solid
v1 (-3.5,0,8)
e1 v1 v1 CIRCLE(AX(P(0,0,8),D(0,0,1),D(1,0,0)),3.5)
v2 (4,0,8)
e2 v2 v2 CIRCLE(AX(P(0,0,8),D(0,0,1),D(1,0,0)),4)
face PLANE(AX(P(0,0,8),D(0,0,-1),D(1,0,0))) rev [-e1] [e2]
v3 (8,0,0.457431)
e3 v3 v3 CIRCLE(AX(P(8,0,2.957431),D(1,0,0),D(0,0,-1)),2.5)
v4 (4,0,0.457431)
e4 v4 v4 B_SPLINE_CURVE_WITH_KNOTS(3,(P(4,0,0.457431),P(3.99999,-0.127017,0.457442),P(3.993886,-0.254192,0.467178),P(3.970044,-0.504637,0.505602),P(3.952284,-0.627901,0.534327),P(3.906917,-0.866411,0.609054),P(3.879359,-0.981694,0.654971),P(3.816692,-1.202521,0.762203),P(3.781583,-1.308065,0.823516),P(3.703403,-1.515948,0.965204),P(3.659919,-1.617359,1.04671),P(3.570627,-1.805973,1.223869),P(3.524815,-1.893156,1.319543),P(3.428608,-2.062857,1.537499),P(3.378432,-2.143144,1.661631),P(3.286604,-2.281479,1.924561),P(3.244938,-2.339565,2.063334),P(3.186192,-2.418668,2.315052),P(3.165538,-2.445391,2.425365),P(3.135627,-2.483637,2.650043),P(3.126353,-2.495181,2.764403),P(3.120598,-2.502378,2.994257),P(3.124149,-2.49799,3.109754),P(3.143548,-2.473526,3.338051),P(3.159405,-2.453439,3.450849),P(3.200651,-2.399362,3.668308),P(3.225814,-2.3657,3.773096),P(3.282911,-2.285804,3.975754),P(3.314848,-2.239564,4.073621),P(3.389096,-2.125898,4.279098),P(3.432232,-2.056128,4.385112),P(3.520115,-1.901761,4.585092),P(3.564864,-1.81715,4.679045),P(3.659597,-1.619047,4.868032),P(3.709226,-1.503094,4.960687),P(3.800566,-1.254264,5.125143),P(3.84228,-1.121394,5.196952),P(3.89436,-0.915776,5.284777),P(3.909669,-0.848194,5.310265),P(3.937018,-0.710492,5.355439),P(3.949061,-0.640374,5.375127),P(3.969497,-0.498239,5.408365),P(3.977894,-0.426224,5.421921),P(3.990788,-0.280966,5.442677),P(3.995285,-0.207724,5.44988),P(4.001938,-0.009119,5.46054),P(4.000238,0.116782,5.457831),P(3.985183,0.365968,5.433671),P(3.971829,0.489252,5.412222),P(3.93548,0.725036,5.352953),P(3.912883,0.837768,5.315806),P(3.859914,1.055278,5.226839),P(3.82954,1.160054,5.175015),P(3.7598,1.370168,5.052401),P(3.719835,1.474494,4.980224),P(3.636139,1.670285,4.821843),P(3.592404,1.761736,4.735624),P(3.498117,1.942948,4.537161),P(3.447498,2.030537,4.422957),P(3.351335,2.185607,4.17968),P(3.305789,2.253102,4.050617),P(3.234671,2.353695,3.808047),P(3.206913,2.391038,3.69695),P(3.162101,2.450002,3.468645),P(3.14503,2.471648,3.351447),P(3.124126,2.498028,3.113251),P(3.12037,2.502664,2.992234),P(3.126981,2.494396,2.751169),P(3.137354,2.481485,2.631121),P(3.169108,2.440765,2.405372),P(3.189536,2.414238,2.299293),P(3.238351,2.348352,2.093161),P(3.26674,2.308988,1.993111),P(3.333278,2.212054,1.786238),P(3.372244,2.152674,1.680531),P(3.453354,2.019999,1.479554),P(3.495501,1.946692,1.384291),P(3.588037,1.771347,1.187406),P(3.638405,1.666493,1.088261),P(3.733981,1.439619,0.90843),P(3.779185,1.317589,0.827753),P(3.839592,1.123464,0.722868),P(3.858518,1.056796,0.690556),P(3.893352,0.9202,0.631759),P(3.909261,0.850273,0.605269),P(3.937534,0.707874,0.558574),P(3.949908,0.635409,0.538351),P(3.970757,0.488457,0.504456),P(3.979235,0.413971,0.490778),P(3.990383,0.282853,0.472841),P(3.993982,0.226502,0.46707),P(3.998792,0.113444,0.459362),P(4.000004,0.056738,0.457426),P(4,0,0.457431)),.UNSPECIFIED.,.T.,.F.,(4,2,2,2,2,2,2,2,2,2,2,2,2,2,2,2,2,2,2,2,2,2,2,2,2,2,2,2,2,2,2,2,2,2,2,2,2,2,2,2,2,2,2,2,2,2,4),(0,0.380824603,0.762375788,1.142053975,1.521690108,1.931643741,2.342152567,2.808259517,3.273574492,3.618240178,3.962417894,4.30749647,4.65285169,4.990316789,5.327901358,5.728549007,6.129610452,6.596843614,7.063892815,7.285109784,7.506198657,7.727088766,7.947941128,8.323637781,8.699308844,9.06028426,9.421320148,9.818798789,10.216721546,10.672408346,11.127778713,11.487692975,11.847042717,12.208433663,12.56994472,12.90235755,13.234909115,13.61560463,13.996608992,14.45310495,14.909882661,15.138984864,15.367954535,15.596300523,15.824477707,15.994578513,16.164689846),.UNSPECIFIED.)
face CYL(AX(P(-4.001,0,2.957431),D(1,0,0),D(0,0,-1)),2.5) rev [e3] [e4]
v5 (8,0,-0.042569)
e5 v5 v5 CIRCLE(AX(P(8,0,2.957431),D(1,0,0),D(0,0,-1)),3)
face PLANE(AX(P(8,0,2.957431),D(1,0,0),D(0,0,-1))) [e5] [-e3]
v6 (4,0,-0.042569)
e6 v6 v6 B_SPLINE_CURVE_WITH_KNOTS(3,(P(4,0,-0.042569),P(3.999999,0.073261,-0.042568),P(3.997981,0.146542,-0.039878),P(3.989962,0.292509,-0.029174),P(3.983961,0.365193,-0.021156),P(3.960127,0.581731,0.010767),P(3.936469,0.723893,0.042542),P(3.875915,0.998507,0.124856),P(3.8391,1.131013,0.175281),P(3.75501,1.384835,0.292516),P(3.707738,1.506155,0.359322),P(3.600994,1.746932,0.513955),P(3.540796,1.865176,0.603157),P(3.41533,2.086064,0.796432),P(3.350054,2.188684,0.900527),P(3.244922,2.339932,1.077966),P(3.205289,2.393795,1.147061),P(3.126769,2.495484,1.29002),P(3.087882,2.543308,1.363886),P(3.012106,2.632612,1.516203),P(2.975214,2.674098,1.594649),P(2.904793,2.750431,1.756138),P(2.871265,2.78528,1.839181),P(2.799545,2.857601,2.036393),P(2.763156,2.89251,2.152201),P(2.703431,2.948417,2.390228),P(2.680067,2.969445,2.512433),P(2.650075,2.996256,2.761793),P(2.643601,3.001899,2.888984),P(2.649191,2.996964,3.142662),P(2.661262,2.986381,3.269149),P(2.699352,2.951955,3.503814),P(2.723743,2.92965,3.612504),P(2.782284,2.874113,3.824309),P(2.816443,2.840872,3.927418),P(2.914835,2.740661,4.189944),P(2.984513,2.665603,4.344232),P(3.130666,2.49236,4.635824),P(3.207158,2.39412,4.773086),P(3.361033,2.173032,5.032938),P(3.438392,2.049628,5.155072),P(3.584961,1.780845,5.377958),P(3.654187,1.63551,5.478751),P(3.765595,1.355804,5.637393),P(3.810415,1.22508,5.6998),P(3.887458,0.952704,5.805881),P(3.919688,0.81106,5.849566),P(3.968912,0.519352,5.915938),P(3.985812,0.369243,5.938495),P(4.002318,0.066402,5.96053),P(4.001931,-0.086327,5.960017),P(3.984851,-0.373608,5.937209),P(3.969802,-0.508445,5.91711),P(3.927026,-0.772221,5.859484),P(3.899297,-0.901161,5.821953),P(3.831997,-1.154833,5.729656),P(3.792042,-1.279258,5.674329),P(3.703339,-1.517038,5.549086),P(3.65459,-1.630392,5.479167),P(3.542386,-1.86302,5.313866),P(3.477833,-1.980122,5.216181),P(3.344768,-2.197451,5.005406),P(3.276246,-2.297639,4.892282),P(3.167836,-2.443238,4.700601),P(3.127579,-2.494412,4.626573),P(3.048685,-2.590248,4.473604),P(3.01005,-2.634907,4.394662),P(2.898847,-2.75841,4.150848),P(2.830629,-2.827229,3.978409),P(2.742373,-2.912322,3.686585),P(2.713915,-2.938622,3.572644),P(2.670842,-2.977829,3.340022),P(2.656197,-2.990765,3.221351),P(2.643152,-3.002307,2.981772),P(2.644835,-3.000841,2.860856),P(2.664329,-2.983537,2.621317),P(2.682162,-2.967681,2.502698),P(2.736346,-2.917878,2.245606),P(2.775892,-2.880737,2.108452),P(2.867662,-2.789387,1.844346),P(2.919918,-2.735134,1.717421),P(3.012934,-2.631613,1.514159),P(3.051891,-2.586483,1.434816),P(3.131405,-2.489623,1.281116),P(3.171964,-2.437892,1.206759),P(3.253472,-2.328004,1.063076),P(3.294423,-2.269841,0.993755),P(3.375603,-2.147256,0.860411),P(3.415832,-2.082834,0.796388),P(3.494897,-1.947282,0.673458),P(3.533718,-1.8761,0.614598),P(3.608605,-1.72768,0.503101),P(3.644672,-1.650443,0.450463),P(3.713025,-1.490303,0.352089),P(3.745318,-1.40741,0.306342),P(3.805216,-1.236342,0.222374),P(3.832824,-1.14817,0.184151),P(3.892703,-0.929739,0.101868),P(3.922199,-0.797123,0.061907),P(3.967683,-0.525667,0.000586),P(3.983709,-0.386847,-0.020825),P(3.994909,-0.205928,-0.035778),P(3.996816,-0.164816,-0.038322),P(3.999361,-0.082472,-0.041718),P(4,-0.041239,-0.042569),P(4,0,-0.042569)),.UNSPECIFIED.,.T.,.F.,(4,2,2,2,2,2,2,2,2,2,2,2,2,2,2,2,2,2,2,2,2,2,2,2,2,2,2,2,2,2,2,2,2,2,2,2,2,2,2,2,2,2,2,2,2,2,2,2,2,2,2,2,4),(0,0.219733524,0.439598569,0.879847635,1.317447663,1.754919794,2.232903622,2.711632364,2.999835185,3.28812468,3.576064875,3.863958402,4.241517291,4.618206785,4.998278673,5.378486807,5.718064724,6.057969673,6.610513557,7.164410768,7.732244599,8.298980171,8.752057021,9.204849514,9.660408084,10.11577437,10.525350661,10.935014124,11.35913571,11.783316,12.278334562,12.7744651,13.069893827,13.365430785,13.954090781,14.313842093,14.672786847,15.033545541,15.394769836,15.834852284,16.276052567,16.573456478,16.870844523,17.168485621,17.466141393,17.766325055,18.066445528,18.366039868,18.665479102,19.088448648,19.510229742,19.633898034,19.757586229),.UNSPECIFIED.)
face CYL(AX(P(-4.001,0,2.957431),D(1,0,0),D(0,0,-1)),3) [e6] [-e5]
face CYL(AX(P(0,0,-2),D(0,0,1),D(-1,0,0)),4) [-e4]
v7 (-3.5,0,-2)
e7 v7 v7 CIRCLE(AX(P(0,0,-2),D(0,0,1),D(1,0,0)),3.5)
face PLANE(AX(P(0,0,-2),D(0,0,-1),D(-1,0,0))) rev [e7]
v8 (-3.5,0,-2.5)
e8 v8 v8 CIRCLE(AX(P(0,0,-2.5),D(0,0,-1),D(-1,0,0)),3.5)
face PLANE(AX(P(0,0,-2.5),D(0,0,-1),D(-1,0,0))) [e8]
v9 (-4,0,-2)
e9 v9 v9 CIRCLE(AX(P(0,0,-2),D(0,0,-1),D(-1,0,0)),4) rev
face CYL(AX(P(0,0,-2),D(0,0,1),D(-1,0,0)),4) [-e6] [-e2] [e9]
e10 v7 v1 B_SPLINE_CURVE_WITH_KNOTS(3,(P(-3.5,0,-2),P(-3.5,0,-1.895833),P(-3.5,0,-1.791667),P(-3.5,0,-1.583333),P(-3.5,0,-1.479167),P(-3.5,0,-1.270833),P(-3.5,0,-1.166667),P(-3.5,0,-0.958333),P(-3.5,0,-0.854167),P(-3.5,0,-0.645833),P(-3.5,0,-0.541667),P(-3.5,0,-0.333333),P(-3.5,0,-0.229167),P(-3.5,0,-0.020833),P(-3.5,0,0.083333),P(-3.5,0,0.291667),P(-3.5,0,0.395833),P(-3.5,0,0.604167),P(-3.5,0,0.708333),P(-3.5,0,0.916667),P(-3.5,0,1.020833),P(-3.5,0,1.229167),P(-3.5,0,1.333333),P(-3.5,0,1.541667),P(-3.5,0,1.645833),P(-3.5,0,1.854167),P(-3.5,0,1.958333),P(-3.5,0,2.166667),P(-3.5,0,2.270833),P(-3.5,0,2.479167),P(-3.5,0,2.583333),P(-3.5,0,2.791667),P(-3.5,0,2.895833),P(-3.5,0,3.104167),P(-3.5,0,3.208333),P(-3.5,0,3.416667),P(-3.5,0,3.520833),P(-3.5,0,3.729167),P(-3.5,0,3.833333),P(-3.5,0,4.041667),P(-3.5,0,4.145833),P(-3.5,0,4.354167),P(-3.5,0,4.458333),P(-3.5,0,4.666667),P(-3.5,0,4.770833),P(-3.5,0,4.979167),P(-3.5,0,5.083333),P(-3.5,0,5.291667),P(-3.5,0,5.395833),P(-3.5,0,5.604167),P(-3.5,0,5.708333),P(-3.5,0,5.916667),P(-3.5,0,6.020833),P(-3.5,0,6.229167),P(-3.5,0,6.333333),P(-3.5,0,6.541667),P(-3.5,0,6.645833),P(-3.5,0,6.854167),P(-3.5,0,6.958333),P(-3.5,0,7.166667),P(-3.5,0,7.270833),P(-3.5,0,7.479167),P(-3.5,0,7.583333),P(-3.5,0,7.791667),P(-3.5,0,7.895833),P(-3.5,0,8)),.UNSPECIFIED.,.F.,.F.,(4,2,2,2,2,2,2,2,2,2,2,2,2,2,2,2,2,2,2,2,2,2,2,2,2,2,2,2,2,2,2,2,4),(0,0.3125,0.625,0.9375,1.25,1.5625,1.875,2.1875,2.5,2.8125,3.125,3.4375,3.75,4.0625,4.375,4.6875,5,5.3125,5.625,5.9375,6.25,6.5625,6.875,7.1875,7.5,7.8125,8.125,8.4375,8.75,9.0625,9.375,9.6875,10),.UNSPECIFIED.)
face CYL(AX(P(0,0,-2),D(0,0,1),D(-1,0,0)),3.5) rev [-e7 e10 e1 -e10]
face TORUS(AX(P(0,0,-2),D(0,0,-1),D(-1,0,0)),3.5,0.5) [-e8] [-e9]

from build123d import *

# Parameters (mm, degrees)
SKETCH2_R                = 4
SKETCH2_R_2              = 3.5
BOSS_EXTRUDE1_DEPTH      = 10
BOSS_EXTRUDE2_REACH      = 15.601
BOSS_EXTRUDE2_END_RADIUS = 4
SKETCH3_R                = 3
SKETCH3_R_2              = 2.5
SKETCH4_R                = 4
BOSS_EXTRUDE3_DEPTH      = 0.5
FILLET2_R                = 0.5


with BuildPart() as part:
    # Sketch2 → Boss-Extrude1 (new body)
    with BuildSketch(Plane.XY.offset(8)):
        Circle(SKETCH2_R)
        Circle(SKETCH2_R_2, mode=Mode.SUBTRACT)
    extrude(amount=BOSS_EXTRUDE1_DEPTH)


with BuildPart() as body_2:
    # Mirror2: mirrored copy
    add(part.part.mirror(Plane.XY.offset(8)))

    # Boss-Extrude2: up to this cylinder (the profile starts outside it)
    boss_extrude2_end = Plane(origin=(0, 0, 5.872578), z_dir=(0, 0, 1)) * Cylinder(BOSS_EXTRUDE2_END_RADIUS, 40.202, mode=Mode.PRIVATE)
    # Sketch3 → Boss-Extrude2 (add, up to the surface)
    with BuildSketch(Plane(origin=(8, 0, 3), x_dir=(0, 0, -1), z_dir=(1, 0, 0)), mode=Mode.PRIVATE) as boss_extrude2_sk1:
        with Locations((0.042568871, 0)):
            Circle(SKETCH3_R)
        with Locations((0.042568871, 0)):
            Circle(SKETCH3_R_2, mode=Mode.SUBTRACT)
    boss_extrude2_tool1 = extrude(boss_extrude2_sk1.sketch, amount=-BOSS_EXTRUDE2_REACH, mode=Mode.PRIVATE) - boss_extrude2_end
    add(boss_extrude2_tool1.solids().sort_by_distance((8, 0, 5.872578))[0])

    # Sketch4 → Boss-Extrude3 (add)
    with BuildSketch(Plane(origin=(0, 0, -2), x_dir=(-1, 0, 0), z_dir=(0, 0, -1))):
        Circle(SKETCH4_R)
    extrude(amount=BOSS_EXTRUDE3_DEPTH)

    # Fillet2
    fillet2_edges = [body_2.edges().sort_by_distance(p)[0] for p in [
        (4, 0, -2.5),
    ]]
    fillet(fillet2_edges, radius=FILLET2_R - 0.0001)  # a hair under: the kernel refuses the full size


solid = body_2.part
